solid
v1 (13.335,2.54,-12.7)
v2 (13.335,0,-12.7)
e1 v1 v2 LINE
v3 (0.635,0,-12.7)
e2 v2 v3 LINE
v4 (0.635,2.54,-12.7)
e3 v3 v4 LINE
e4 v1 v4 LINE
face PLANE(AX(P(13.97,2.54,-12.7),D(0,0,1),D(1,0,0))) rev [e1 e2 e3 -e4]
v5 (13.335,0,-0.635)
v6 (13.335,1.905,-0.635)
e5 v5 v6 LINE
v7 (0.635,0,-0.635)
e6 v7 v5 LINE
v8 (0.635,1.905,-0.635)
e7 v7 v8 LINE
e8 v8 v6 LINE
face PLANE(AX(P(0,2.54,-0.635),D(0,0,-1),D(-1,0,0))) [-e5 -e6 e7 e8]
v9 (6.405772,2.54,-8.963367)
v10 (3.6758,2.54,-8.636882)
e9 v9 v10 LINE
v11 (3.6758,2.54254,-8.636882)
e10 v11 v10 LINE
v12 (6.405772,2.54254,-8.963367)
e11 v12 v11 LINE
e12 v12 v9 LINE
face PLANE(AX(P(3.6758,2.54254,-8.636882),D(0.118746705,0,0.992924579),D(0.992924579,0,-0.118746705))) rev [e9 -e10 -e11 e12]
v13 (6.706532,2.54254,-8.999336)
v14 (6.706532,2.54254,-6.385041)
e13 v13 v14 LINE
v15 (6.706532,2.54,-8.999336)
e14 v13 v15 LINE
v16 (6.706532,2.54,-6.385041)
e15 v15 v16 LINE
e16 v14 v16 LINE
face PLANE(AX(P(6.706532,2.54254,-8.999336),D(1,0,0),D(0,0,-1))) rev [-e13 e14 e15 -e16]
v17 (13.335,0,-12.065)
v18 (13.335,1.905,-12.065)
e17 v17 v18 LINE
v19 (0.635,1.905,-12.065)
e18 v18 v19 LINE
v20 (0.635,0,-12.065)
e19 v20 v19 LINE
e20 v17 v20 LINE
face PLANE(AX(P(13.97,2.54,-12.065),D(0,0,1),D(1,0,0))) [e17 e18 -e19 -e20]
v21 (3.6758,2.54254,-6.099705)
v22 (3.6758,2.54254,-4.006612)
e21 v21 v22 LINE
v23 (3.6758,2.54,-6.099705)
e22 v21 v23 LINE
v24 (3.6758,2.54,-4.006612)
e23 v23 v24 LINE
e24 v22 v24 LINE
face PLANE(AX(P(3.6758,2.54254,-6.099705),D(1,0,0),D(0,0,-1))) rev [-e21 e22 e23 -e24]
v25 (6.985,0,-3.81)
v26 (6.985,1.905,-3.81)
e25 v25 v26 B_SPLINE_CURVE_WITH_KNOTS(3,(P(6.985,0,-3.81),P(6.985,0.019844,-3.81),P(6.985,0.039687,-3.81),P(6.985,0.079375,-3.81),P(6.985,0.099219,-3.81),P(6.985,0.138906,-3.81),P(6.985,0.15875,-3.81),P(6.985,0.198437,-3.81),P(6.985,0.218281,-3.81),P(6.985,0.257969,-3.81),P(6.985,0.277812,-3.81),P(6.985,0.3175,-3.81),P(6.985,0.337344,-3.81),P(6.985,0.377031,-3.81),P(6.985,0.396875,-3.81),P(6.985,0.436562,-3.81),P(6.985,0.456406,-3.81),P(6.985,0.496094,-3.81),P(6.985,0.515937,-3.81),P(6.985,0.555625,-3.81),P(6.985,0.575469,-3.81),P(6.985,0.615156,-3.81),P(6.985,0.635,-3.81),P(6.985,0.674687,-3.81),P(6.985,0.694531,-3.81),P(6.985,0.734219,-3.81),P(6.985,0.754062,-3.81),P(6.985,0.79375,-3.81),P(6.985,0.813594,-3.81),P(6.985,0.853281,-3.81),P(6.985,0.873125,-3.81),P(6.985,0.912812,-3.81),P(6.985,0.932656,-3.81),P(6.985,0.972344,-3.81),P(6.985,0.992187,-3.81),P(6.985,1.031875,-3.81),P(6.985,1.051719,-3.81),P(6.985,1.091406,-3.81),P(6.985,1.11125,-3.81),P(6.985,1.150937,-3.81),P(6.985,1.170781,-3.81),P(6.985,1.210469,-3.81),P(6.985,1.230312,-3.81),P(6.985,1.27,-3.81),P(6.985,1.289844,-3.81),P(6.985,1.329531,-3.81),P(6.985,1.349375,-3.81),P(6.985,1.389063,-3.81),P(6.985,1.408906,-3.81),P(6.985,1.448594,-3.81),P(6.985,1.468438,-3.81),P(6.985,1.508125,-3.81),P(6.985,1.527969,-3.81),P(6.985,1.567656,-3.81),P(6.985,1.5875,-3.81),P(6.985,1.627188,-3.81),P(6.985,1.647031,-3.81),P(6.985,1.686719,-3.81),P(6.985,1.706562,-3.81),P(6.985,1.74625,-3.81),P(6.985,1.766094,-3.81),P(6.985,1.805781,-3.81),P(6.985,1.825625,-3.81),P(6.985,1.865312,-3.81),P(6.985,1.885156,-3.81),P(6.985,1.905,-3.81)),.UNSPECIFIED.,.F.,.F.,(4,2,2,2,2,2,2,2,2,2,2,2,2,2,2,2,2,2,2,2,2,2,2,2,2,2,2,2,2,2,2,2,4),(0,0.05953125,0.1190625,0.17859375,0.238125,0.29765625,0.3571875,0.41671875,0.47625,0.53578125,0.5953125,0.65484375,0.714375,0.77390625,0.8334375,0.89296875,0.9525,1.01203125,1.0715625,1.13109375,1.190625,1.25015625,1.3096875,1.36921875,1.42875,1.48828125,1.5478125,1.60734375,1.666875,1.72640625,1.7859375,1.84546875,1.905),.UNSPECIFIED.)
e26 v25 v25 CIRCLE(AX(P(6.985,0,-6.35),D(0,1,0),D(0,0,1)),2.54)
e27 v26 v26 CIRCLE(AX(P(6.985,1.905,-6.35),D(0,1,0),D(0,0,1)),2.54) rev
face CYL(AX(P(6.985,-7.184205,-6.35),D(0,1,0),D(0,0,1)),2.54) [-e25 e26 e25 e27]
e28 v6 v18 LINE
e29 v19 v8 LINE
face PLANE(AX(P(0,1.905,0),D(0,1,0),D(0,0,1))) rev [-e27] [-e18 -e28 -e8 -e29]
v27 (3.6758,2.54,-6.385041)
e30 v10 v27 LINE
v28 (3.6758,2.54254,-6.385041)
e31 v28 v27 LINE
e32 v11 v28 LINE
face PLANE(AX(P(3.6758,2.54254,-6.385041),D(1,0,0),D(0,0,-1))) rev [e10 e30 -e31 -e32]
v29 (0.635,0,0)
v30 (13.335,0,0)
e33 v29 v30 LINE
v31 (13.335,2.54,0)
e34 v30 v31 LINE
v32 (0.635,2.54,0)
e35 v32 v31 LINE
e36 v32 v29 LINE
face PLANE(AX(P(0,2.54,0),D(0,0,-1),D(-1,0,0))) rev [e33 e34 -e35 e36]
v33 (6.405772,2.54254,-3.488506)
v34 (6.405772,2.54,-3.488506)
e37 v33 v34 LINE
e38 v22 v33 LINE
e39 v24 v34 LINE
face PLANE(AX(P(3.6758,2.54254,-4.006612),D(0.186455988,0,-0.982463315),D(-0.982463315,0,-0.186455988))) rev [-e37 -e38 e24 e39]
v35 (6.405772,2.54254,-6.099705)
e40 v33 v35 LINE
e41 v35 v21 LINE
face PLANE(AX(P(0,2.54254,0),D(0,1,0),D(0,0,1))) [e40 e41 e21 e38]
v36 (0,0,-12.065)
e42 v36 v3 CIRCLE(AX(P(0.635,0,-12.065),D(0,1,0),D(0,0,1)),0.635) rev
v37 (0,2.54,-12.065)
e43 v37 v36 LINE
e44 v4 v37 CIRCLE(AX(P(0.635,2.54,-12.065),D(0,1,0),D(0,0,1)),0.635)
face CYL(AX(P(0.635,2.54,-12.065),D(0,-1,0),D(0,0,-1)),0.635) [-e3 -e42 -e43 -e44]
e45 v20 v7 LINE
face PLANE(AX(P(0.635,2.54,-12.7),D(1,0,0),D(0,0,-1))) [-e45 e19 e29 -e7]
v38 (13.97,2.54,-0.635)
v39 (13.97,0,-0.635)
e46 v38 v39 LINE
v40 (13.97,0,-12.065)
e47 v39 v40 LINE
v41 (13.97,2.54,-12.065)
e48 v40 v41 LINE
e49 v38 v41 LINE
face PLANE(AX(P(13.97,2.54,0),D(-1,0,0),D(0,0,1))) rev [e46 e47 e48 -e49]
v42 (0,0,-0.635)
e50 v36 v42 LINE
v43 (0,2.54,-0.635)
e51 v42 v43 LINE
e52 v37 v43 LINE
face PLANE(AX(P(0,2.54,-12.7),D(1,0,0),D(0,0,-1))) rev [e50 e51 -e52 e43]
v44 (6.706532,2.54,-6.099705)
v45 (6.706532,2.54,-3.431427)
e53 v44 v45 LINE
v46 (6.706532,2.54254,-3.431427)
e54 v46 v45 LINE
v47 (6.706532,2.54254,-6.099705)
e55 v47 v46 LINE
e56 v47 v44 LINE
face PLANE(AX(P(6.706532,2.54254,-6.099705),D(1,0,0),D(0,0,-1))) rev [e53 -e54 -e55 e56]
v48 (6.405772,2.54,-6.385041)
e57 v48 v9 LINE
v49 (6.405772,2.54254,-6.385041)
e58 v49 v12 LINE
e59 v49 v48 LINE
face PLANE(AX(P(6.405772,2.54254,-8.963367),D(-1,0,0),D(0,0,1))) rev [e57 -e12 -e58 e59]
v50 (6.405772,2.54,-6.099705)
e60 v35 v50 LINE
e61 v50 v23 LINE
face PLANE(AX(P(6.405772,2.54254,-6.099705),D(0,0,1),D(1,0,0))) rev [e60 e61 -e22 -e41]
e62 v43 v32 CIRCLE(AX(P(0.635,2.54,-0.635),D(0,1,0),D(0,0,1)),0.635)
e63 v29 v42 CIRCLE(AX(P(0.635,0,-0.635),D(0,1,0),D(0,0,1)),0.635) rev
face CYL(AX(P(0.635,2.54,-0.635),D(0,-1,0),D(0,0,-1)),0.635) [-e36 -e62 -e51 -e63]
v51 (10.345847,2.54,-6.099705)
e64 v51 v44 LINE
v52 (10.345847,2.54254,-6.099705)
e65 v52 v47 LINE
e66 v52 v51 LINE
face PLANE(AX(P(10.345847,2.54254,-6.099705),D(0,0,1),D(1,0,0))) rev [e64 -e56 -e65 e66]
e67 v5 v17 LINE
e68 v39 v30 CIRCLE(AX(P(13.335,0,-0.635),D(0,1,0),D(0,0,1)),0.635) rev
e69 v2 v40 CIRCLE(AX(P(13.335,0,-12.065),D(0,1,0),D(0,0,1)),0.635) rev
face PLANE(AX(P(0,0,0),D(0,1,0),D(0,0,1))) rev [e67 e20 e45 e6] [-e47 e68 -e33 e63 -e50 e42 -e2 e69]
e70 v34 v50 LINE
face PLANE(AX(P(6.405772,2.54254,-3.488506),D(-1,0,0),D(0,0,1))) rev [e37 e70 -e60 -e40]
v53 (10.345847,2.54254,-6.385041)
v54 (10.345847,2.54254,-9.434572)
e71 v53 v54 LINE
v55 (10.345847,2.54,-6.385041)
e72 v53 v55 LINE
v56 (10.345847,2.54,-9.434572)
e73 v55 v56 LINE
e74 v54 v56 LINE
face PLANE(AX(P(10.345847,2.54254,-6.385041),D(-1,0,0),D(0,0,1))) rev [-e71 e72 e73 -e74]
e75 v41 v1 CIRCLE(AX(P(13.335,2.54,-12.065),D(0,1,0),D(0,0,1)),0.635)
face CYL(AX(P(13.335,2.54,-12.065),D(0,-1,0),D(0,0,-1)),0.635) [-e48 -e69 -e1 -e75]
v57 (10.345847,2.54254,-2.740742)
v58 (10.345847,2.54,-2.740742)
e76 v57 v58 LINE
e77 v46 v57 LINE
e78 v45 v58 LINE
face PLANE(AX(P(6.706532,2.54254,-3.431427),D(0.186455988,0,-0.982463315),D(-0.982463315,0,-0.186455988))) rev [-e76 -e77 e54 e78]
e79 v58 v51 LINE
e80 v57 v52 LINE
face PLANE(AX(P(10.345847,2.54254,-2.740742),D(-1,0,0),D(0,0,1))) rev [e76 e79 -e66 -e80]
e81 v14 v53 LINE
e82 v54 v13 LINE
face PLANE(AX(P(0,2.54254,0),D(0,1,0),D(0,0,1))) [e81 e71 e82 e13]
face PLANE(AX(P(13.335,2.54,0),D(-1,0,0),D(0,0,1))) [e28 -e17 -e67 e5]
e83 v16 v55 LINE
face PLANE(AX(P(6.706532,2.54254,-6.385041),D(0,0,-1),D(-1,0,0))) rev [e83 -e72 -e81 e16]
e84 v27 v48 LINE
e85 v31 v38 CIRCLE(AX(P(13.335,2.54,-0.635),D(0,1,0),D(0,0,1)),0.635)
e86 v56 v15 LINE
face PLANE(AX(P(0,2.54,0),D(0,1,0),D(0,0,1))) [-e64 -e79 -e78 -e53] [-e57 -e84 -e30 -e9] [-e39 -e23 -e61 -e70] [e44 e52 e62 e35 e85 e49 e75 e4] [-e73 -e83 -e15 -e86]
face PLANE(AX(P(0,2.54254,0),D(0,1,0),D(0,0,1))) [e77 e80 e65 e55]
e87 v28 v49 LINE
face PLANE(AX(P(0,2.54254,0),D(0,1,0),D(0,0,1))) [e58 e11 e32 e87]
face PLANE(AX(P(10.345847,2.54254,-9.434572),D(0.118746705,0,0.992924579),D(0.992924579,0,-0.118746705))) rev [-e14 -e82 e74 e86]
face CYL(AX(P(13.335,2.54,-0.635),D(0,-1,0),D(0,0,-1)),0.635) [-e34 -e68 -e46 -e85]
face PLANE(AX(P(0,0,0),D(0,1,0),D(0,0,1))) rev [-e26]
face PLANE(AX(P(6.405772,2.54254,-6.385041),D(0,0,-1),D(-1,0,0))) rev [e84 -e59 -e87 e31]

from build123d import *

# Parameters (mm, degrees)
SKETCH1_W           = 13.97
SKETCH1_H           = 12.7
BOSS_EXTRUDE1_DEPTH = 2.54
FILLET1_R           = 0.635
SHELL1_START        = 0.635
SHELL1_OUTLINE_W    = 1.905
SHELL1_OUTLINE_H    = 11.43
SHELL1_DEPTH        = 12.7
SKETCH2_R           = 2.54
BOSS_EXTRUDE2_DEPTH = 1.905
BOSS_EXTRUDE4_DEPTH = 0.00254


# Read off the part's stored shape, not the designer's step: Shell1
with BuildPart() as part:
    # Sketch1 → Boss-Extrude1 (new body)
    with BuildSketch(Plane(origin=(0, 0, 0), x_dir=(1, 0, 0), z_dir=(0, 1, 0))):
        with Locations((6.985, 6.35)):
            Rectangle(SKETCH1_W, SKETCH1_H)
    extrude(amount=BOSS_EXTRUDE1_DEPTH)

    # Fillet1
    fillet1_edges = [part.edges().sort_by_distance(p)[0] for p in [
        (0, 1.27, -12.7),
        (13.97, 1.27, -12.7),
        (13.97, 1.27, 0),
        (0, 1.27, 0),
    ]]
    fillet(fillet1_edges, radius=FILLET1_R)

    # Shell1 outline → Shell1 (cut)
    with BuildSketch(Plane.YZ.offset(SHELL1_START)):
        with Locations((0.9525, -6.35)):
            Rectangle(SHELL1_OUTLINE_W, SHELL1_OUTLINE_H)
    extrude(amount=SHELL1_DEPTH, mode=Mode.SUBTRACT)

    # Sketch2 → Boss-Extrude2 (add)
    with BuildSketch(Plane(origin=(0, 1.905, 0), x_dir=(-1, 0, 0), z_dir=(0, -1, 0))):
        with Locations(Location((-6.985, 6.35, 0), (0, 0, 270))):
            Circle(SKETCH2_R)
    extrude(amount=BOSS_EXTRUDE2_DEPTH)

    # Sketch5 → Boss-Extrude4 (add)
    with BuildSketch(Plane(origin=(0, 2.54, 0), x_dir=(1, 0, 0), z_dir=(0, 1, 0))):
        Polygon((3.675799971, 8.636881907), (6.405771964, 8.963367107), (6.405771964, 6.385040601), (3.675799971, 6.385040601), align=None)
        Polygon((3.675799971, 6.099704546), (3.675799971, 4.006611728), (6.405771964, 3.488506251), (6.405771964, 6.099704546), align=None)
        Polygon((6.706531591, 8.999335816), (6.706531591, 6.385040601), (10.345846979, 6.385040601), (10.345846979, 9.434572007), align=None)
        Polygon((6.706531591, 6.099704546), (6.706531591, 3.431426834), (10.345846979, 2.740742373), (10.345846979, 6.099704546), align=None)
    extrude(amount=BOSS_EXTRUDE4_DEPTH)


solid = part.part
